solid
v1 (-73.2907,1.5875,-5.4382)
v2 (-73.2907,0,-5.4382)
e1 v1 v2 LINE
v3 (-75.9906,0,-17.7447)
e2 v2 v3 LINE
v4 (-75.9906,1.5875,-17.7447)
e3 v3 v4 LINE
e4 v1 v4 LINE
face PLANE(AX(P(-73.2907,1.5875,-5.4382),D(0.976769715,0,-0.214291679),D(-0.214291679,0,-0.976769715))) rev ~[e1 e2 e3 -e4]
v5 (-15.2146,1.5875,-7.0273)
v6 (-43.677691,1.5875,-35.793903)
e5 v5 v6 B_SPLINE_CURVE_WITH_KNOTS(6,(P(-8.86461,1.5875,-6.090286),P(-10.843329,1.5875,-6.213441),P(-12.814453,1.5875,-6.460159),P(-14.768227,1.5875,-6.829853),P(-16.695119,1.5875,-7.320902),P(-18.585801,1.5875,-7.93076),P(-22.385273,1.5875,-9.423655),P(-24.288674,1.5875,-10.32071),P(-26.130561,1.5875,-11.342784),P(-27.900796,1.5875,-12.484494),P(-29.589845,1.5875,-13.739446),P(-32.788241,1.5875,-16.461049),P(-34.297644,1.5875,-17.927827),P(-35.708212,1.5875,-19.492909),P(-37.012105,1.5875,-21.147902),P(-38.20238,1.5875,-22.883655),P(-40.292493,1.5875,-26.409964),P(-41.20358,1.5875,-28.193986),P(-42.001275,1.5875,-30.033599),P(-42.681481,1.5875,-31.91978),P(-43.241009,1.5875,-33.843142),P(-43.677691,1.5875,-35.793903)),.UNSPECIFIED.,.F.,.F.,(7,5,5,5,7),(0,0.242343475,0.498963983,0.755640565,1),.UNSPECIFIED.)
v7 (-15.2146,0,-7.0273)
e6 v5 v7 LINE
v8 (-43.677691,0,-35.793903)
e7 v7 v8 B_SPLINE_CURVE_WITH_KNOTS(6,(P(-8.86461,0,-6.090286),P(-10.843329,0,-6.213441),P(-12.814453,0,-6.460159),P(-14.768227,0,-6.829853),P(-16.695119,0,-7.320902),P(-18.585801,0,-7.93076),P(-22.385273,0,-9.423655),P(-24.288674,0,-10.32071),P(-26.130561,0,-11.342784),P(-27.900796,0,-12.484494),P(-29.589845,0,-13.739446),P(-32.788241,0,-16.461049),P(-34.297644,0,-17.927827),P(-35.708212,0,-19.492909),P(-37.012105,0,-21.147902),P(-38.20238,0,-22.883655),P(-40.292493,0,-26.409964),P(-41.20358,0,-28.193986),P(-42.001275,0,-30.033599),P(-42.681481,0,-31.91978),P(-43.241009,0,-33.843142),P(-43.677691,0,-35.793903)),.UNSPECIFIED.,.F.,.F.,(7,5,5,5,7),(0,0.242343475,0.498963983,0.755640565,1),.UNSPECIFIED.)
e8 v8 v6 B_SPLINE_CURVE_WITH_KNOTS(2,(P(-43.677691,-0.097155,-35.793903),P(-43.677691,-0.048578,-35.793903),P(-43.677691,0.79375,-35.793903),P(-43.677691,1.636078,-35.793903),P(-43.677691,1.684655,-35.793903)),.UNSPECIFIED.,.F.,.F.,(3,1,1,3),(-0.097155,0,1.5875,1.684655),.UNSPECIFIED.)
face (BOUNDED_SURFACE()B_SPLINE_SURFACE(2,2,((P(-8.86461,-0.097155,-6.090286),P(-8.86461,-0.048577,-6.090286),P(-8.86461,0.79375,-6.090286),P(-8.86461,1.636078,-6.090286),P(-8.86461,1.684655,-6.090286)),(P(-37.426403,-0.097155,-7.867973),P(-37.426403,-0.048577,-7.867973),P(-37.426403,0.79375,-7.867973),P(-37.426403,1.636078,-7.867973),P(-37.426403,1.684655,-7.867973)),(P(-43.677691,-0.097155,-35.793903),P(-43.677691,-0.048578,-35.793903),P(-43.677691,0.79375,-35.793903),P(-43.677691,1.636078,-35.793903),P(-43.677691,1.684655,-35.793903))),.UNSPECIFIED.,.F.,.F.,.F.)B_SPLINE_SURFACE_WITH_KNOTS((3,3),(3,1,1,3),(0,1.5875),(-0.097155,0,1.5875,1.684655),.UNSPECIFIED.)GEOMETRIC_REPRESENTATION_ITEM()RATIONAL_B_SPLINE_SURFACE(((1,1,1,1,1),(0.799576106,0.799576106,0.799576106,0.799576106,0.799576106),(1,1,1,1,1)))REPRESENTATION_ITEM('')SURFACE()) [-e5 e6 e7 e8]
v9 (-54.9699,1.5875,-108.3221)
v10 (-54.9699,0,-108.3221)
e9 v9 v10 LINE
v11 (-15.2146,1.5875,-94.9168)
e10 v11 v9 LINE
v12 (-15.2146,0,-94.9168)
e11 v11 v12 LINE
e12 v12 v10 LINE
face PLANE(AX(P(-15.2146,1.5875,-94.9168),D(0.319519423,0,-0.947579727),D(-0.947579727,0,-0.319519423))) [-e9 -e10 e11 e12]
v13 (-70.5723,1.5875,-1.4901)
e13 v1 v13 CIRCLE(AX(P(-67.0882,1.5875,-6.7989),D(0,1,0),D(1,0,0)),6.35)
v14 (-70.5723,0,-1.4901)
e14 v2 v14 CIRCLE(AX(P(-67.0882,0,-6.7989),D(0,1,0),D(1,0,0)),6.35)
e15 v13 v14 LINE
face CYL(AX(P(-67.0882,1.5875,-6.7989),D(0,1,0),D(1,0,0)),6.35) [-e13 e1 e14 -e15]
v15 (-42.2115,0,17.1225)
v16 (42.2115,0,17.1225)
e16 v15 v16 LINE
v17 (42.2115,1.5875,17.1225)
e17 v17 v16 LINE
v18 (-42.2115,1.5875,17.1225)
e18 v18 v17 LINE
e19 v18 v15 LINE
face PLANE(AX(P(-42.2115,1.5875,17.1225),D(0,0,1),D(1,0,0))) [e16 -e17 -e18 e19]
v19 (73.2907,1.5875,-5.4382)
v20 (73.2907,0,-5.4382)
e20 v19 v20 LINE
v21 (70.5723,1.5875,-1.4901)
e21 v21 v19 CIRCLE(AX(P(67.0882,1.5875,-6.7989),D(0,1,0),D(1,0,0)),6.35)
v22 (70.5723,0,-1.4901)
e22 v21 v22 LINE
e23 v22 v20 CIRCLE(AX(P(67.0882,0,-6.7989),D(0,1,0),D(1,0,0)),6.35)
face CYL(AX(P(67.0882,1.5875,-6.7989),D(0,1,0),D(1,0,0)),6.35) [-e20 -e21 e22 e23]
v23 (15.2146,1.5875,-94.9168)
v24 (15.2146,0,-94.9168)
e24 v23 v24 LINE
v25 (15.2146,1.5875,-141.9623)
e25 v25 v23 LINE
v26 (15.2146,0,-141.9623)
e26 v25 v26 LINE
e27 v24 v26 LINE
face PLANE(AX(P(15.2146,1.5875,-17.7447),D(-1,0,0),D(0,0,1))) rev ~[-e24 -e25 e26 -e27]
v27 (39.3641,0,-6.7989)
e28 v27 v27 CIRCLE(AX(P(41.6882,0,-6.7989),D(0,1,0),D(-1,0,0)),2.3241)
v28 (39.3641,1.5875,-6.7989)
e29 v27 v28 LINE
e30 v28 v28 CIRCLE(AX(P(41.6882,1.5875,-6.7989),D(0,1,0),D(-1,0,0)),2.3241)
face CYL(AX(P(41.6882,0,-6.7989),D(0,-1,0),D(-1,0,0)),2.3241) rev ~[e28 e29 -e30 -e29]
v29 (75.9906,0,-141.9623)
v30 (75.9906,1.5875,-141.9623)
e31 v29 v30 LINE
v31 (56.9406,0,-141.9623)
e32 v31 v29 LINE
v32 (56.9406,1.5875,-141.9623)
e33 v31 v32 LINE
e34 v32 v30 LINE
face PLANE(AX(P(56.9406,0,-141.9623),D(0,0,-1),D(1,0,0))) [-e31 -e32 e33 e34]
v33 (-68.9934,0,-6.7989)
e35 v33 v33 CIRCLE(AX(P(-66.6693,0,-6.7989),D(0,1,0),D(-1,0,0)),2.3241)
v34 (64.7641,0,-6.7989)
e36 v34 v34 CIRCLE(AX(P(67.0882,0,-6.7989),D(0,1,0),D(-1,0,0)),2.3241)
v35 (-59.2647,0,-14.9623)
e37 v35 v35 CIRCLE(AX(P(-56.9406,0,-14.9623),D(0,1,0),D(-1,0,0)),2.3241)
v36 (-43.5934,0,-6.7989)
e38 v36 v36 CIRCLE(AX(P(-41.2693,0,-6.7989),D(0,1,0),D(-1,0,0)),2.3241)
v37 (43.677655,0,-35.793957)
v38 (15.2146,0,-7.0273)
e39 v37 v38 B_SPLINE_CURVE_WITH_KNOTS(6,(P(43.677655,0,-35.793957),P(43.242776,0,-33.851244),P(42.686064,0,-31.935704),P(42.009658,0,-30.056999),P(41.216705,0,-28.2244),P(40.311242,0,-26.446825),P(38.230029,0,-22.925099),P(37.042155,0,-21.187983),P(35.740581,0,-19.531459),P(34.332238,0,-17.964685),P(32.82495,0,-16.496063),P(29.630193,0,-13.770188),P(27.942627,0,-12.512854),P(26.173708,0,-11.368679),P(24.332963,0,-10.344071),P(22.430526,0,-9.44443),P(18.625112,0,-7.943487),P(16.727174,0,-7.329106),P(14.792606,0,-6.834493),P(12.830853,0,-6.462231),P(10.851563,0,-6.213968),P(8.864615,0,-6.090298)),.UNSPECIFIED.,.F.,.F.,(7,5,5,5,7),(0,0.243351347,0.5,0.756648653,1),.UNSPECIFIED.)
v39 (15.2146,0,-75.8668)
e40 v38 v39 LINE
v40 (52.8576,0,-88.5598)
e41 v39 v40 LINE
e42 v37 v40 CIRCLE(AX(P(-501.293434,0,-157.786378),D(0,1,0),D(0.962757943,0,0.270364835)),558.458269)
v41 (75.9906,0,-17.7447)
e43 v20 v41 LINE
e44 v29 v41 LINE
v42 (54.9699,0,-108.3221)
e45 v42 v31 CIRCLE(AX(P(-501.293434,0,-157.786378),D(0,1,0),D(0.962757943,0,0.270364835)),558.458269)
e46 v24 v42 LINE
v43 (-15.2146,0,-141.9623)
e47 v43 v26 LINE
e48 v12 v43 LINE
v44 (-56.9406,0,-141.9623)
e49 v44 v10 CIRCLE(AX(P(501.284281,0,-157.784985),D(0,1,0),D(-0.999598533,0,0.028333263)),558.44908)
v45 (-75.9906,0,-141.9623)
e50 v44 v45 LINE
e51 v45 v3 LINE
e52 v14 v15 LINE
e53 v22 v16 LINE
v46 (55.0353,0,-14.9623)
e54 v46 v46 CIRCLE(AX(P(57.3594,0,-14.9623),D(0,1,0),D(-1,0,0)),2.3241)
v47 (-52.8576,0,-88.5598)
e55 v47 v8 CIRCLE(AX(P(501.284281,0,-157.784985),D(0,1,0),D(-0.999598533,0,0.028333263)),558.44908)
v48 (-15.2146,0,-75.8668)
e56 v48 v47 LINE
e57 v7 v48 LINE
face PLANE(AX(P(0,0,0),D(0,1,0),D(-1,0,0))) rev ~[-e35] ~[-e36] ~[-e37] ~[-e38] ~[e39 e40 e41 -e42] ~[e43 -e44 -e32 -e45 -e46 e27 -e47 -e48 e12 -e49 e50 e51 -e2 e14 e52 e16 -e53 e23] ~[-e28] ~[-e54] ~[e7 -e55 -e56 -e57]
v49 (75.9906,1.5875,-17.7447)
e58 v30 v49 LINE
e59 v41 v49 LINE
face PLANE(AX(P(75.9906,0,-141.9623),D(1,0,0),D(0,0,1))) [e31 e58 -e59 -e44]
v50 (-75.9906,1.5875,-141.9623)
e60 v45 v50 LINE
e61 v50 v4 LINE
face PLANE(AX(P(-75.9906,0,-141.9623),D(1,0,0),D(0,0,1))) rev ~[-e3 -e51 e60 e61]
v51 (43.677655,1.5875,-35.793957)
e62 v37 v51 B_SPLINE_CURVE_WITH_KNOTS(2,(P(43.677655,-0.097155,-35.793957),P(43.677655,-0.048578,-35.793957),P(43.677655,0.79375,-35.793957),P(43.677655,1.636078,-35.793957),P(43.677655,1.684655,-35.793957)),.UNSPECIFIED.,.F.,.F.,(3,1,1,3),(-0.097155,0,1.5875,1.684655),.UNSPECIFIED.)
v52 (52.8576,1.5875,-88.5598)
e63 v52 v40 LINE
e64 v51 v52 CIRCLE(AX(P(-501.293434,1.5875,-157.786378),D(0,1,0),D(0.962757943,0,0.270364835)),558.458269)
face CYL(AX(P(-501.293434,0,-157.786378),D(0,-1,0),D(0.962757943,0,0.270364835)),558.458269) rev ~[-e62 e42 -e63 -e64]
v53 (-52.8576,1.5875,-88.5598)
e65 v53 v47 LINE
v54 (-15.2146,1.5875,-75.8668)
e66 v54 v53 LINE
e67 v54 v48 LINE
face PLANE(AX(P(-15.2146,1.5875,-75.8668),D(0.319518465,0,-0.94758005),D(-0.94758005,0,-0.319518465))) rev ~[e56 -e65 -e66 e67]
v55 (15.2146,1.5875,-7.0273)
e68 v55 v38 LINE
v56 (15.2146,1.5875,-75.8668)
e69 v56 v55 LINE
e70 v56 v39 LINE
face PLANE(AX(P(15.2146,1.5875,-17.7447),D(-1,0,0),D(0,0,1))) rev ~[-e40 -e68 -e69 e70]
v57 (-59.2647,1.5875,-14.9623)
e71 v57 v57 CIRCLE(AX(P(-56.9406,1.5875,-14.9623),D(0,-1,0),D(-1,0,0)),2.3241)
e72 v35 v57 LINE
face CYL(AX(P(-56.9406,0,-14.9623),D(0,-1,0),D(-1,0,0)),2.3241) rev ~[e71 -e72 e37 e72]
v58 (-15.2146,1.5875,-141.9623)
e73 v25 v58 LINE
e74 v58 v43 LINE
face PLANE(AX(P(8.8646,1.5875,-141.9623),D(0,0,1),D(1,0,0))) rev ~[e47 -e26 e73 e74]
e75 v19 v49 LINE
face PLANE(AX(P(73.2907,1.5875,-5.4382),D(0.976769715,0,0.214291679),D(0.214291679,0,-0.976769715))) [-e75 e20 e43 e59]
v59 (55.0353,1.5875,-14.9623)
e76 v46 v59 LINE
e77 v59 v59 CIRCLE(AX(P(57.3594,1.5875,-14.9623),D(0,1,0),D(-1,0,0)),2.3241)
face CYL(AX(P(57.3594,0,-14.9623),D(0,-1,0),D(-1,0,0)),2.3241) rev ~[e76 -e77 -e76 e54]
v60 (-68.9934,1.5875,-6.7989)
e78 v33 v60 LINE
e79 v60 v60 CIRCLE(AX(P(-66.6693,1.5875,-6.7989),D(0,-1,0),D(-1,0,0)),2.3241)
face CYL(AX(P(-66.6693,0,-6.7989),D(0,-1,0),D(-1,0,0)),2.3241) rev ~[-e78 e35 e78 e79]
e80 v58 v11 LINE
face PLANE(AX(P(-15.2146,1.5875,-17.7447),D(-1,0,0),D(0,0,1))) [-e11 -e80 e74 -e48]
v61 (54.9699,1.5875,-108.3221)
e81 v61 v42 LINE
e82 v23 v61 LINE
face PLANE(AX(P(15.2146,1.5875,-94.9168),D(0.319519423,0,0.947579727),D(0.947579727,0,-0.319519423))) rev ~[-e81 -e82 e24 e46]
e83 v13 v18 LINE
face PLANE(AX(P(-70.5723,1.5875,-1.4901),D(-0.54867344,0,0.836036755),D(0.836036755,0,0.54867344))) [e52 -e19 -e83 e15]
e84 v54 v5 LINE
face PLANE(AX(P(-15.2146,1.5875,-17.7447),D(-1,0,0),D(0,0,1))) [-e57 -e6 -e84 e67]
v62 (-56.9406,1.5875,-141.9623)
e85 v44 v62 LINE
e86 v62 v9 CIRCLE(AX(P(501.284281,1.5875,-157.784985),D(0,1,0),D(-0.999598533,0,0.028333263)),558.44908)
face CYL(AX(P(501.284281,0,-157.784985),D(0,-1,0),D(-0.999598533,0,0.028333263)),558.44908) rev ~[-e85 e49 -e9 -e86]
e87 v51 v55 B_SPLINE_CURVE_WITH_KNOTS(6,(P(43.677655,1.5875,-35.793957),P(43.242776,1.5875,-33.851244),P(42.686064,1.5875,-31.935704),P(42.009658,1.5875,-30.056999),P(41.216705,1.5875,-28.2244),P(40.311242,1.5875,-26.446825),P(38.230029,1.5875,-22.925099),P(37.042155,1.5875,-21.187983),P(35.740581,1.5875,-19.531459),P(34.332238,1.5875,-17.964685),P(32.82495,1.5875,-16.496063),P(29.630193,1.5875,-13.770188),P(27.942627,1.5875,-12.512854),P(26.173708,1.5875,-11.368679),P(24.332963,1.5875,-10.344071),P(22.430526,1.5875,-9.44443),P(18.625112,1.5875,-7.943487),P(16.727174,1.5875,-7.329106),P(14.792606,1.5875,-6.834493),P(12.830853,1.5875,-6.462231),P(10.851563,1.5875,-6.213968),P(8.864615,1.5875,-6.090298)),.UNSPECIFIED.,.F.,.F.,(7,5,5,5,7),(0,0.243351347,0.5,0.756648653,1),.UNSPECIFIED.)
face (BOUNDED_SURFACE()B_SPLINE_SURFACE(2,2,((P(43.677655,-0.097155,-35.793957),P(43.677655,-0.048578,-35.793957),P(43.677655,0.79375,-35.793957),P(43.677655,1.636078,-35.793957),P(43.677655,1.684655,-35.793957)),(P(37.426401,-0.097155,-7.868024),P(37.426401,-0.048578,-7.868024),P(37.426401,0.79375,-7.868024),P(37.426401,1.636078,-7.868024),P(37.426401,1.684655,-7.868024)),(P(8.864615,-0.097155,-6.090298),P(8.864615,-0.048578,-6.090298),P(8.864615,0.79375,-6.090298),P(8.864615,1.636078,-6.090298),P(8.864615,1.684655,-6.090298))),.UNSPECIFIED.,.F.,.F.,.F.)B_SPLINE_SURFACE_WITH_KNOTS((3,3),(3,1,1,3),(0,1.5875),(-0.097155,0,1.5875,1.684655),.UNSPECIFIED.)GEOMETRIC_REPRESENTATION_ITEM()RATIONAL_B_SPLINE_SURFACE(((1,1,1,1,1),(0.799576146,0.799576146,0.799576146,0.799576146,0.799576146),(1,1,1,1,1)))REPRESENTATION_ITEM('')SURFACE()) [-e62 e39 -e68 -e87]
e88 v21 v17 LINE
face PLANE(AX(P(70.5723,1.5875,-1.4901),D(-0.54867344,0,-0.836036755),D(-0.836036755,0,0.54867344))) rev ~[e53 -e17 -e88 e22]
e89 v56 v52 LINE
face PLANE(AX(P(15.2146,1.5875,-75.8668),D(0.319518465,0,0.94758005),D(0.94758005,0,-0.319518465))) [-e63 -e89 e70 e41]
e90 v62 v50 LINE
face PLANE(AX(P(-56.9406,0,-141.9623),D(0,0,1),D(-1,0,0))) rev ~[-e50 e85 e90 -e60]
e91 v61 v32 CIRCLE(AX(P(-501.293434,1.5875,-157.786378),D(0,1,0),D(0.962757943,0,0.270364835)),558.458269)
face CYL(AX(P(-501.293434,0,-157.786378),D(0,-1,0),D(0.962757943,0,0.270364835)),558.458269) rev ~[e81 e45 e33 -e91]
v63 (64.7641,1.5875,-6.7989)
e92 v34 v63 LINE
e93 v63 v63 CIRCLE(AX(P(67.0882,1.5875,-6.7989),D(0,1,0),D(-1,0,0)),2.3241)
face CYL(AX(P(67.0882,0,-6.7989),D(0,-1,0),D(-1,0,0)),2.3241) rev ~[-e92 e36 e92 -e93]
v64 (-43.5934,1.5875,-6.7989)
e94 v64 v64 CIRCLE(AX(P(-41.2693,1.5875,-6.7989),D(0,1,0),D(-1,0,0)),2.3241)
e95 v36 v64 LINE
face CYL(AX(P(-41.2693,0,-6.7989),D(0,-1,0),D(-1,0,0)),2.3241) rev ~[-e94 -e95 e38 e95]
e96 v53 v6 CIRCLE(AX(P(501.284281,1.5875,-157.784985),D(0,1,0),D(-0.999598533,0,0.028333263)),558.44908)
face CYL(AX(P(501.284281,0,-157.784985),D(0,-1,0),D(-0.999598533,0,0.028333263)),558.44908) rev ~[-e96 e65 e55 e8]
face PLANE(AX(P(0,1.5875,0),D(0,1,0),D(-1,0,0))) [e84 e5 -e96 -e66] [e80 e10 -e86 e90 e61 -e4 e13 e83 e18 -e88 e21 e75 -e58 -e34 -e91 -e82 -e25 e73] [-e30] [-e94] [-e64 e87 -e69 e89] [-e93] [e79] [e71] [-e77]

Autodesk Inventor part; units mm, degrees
ref_plane "YZ Plane" through (0, 0, 0) normal (1, 0, 0) x (0, 1, 0)
ref_plane "XZ Plane" through (0, 0, 0) normal (0, 1, 0) x (-1, 0, 0)
ref_plane "XY Plane" through (0, 0, 0) normal (0, 0, 1) x (1, 0, 0)
sketch "Sketch1" plane through (0, 0, 0) normal (0, 1, 0) x (-1, 0, 0)
  circle A0 centre (56.9406, -14.9623) radius 2.3241
  circle A1 centre (66.6693, -6.7989) radius 2.3241
  circle A2 centre (41.2693, -6.7989) radius 2.3241
  circle A3 centre (-41.6882, -6.7989) radius 2.3241
  circle A4 centre (-57.3594, -14.9623) radius 2.3241
  circle A5 centre (-67.0882, -6.7989) radius 2.3241
  arc A6 (-59.7156, -7.3708) -> (-58.0844, -7.6169) centre (-58.6976, -6.1526) ccw
  line L0 (-59.7156, -7.3708) -> (-85.288, 13.999)
  arc A7 (-43.7185, -2.4382) -> (-58.0844, -7.6169) centre (0.2546, -146.9346) ccw
  arc A8 (-43.7185, -2.4382) -> (-37.2086, 0.6056) centre (-51.1134, 21.8615) ccw
  arc A9 (-69.7478, -12.8722) -> (-69.4607, -10.2448) centre (-70.4786, -11.4629) ccw
  line L1 (-99.204, 14.6104) -> (-69.4607, -10.2448)
  arc A10 (-69.7478, -12.8722) -> (-78.2828, -17.6558) centre (-0.2094, -146.9516) ccw
  arc A11 (-16.3345, 6.2393) -> (-15.3068, 3.3313) centre (-15.4655, 4.9108) ccw
  arc A12 (14.8879, 3.3313) -> (-15.3068, 3.3313) centre (-0.2094, -146.9516) ccw
  arc A13 (14.8879, 3.3313) -> (15.9157, 6.2393) centre (15.0466, 4.9108) ccw
  arc A14 (37.2538, 0.5886) -> (43.7637, -2.4551) centre (51.1586, 21.8446) ccw
  arc A15 (58.1296, -7.6339) -> (43.7637, -2.4551) centre (-0.2094, -146.9516) ccw
  line L2 (85.3331, 13.982) -> (59.7607, -7.3877)
  arc A16 (58.1296, -7.6339) -> (59.7607, -7.3877) centre (58.7428, -6.1696) ccw
  line L3 (69.0418, -10.2448) -> (98.7851, 14.6104)
  arc A17 (69.0418, -10.2448) -> (69.3289, -12.8722) centre (70.0598, -11.4629) ccw
  arc A18 (77.8639, -17.6558) -> (69.3289, -12.8722) centre (-0.2094, -146.9516) ccw
  line L4 (66.6693, -6.7989) -> (41.2693, -6.7989)
  line L5 (0, 0) -> (0, 4.0875)
  circle A19 centre (66.6693, -6.7989) radius 3.9782
  circle A20 centre (41.2693, -6.7989) radius 4.9026
  line L6 (66.6693, -2.8207) -> (41.4483, -1.8996)
  circle A21 centre (56.9406, -14.9623) radius 4.1852
  line L7 (69.4813, -9.613) -> (60.0669, -17.7447)
  line L8 (54.6165, -18.4429) -> (39.1949, -11.241)
  line L9 (56.9406, -14.9623) -> (56.9406, -141.9623)
  arc A22 (56.9406, -141.9623) -> (36.3667, -6.7989) centre (-501.2889, -157.7854) ccw
  line L10 (56.9406, -141.9623) -> (75.9906, -141.9623)
  line L11 (75.9906, -141.9623) -> (75.9906, -17.7447)
  line L12 (75.9906, -17.7447) -> (65.708, -12.8722)
  circle A23 centre (-66.6693, -6.7989) radius 3.9782
  circle A24 centre (-41.2693, -6.7989) radius 4.9026
  line L13 (-66.6693, -2.8207) -> (-41.4483, -1.8996)
  circle A25 centre (-56.9406, -14.9623) radius 4.1852
  line L14 (-69.4813, -9.613) -> (-60.0669, -17.7447)
  arc A26 (-36.3667, -6.7989) -> (-56.9406, -141.9623) centre (501.2889, -157.7854) ccw
  line L15 (-56.9406, -141.9623) -> (-75.9906, -141.9623)
  line L16 (-75.9906, -141.9623) -> (-75.9906, -17.7447)
  line L17 (-75.9906, -17.7447) -> (-65.708, -12.8722)
  arc A27 (42.2115, -1.9275) -> (-42.2115, -1.9275) centre (0, -148.5156) ccw
  arc A28 (39.6774, -11.4417) -> (-39.7321, -11.4576) centre (0, -148.5156) ccw
  point P0 (-37.4811, -10.825)
  point P1 (37.4811, -10.825)
  dimension "d0" = 127
  dimension "d1" = 19.05
extrude "Extrusion1" add sketch "Sketch1" along normal blind 1.5875 contours L0 L13 A8 A7 A6 | A6 A7 A8 A24 A26 L15 L16 L17 L14 A23 L13 L0 | A23 L14 | L13 A24 A8 | A27 L6 A20 A22 A28 A26 A24 L13 | A24 A26 | A26 A24 | L6 L2 L4 A15 A14 | A14 A20 L6 | A14 A15 L4 A20 | A20 A22 | L6 A19 L2 | A28 L8 A21 L9 A22 | A22 A20 L8 A28 | L4 A15 A16 L2 A19 L7 A21 L8 A20 | A22 A20 | A19 L4 L2 | A19 L7 | L9 A21 L7 L12 L11 L10 | L4 L2 A16 A15 | A21 | A25 picked at (-63.4219, -7.1214) picked at (63.3048, -7.3068)
fillet "Fillet1" radius 38.1 2 edges at (37.4811, 0.7937, -10.825) (-37.4811, 0.7937, -10.825)
sketch "Sketch2" plane through (0, 1.5875, 0) normal (0, 1, 0) x (1, 0, 0)
  line L0 (0, 0) -> (0, -4.0291)
  arc A0 (-42.2115, 1.9275) -> (42.2115, 1.9275) centre (0, 148.5156) ccw projected
  line L1 (42.2115, 1.9275) -> (66.6693, 2.8207) projected
  arc A1 (66.6693, 2.8207) -> (69.4813, 9.613) centre (66.6693, 6.7989) ccw projected
  line L2 (69.4813, 9.613) -> (65.708, 12.8722) projected
  line L3 (65.708, 12.8722) -> (75.9906, 17.7447) projected
  line L4 (75.9906, 17.7447) -> (75.9906, 141.9623) projected
  line L5 (75.9906, 141.9623) -> (56.9406, 141.9623) projected
  arc A2 (43.6777, 35.794) -> (56.9406, 141.9623) centre (-501.2889, 157.7854) ccw projected
  arc A3 (8.8646, 6.0903) -> (43.6777, 35.794) centre (6.4979, 44.1168) ccw projected
  arc A4 (-8.8646, 6.0903) -> (8.8646, 6.0903) centre (0, 148.5156) ccw projected
  arc A5 (-43.6777, 35.794) -> (-8.8646, 6.0903) centre (-6.4979, 44.1168) ccw projected
  arc A6 (-56.9406, 141.9623) -> (-43.6777, 35.794) centre (501.2889, 157.7854) ccw projected
  line L6 (-56.9406, 141.9623) -> (-75.9906, 141.9623) projected
  line L7 (-75.9906, 141.9623) -> (-75.9906, 17.7447) projected
  line L8 (-75.9906, 17.7447) -> (-65.708, 12.8722) projected
  line L9 (-65.708, 12.8722) -> (-69.4813, 9.613) projected
  arc A7 (-69.4813, 9.613) -> (-66.6693, 2.8207) centre (-66.6693, 6.7989) ccw projected
  line L10 (-66.6693, 2.8207) -> (-42.2115, 1.9275) projected
  arc A8 (-42.2115, 1.9275) -> (42.2115, 1.9275) centre (0, 148.5156) ccw projected
  circle A9 centre (-41.2693, 6.7989) radius 2.3241 projected
  circle A10 centre (-66.6693, 6.7989) radius 2.3241 projected
  circle A11 centre (57.3594, 14.9623) radius 2.3241 projected
  circle A12 centre (67.0882, 6.7989) radius 2.3241 projected
  circle A13 centre (41.6882, 6.7989) radius 2.3241 projected
  circle A14 centre (-56.9406, 14.9623) radius 2.3241 projected
  circle A15 centre (67.0882, 6.7989) radius 6.35
  line L11 (73.2907, 5.4382) -> (75.9906, 17.7447)
  line L12 (42.2115, 1.9275) -> (66.7086, 0.4603)
  circle A16 centre (-67.0882, 6.7989) radius 6.35
  line L13 (-73.2907, 5.4382) -> (-75.9906, 17.7447)
  line L14 (-42.2115, 1.9275) -> (-66.7086, 0.4603)
  point P0 (-42.2115, 1.9275)
  dimension "d5" = 12.7
extrude "Extrusion2" add sketch "Sketch2" against normal blind 1.5875 contours L14 A16 L10 | A16 L8 L9 A7 L10 | L1 A15 L12 | L13 L8 A16 | L1 A1 L2 L3 A15 | L3 L11 A15 picked at (-67.6214, 11.869) picked at (67.6293, 11.8682)
sketch "Sketch3" plane through (0, 1.5875, 0) normal (0, 1, 0) x (1, 0, 0)
  line L0 (75.9906, 17.7447) -> (75.9906, 141.9623) projected
  line L1 (75.9906, 141.9623) -> (56.9406, 141.9623) projected
  arc A0 (43.6777, 35.794) -> (56.9406, 141.9623) centre (-501.2889, 157.7854) ccw projected
  arc A1 (8.8646, 6.0903) -> (43.6777, 35.794) centre (6.4979, 44.1168) ccw projected
  arc A2 (-8.8646, 6.0903) -> (8.8646, 6.0903) centre (0, 148.5156) ccw projected
  arc A3 (-43.6777, 35.794) -> (-8.8646, 6.0903) centre (-6.4979, 44.1168) ccw projected
  arc A4 (-56.9406, 141.9623) -> (-43.6777, 35.794) centre (501.2889, 157.7854) ccw projected
  line L2 (-56.9406, 141.9623) -> (-75.9906, 141.9623) projected
  line L3 (-75.9906, 141.9623) -> (-75.9906, 17.7447) projected
  line L4 (-75.9906, 17.7447) -> (-73.2907, 5.4382) projected
  arc A5 (-73.2907, 5.4382) -> (-66.7086, 0.4603) centre (-67.0882, 6.7989) ccw projected
  line L5 (-66.7086, 0.4603) -> (-42.2115, 1.9275) projected
  arc A6 (-42.2115, 1.9275) -> (42.2115, 1.9275) centre (0, 148.5156) ccw projected
  line L6 (42.2115, 1.9275) -> (66.7086, 0.4603) projected
  arc A7 (66.7086, 0.4603) -> (73.2907, 5.4382) centre (67.0882, 6.7989) ccw projected
  line L7 (73.2907, 5.4382) -> (75.9906, 17.7447) projected
  circle A8 centre (-41.2693, 6.7989) radius 2.3241 projected
  circle A9 centre (-66.6693, 6.7989) radius 2.3241 projected
  circle A10 centre (57.3594, 14.9623) radius 2.3241 projected
  circle A11 centre (67.0882, 6.7989) radius 2.3241 projected
  circle A12 centre (41.6882, 6.7989) radius 2.3241 projected
  circle A13 centre (-56.9406, 14.9623) radius 2.3241 projected
  line L8 (-75.9906, 141.9623) -> (-75.9906, 17.7447) projected
  line L9 (75.9906, 17.7447) -> (-75.9906, 17.7447)
  line L10 (-75.9906, 17.7447) -> (0, 17.7447)
  line L11 (0, 17.7447) -> (0, 5.8147)
  arc A14 (-8.8646, 6.0903) -> (8.8646, 6.0903) centre (0, 148.5156) ccw projected
  line L12 (8.8646, 141.9623) -> (-8.8646, 141.9623)
  line L13 (8.8646, 141.9623) -> (15.2146, 141.9623)
  line L14 (-8.8646, 141.9623) -> (-15.2146, 141.9623)
  line L15 (-15.2146, 141.9623) -> (-15.2146, 7.0273)
  line L16 (15.2146, 141.9623) -> (15.2146, 7.0273)
  point P0 (0, 0)
  dimension "d8" = 6.35
  dimension "d9" = 6.35
extrude "Extrusion3" add sketch "Sketch3" against normal blind 1.5875 contours A1 A2 L11 L9 L16 | L9 L15 L14 L12 L13 L16 | L11 A2 A3 L15 L9
sketch "Sketch4" plane through (0, 1.5875, 0) normal (0, 1, 0) x (1, 0, 0)
  line L0 (75.9906, 17.7447) -> (75.9906, 141.9623) projected
  line L1 (75.9906, 141.9623) -> (56.9406, 141.9623) projected
  arc A0 (43.6777, 35.794) -> (56.9406, 141.9623) centre (-501.2889, 157.7854) ccw projected
  arc A1 (15.2146, 7.0273) -> (43.6777, 35.794) centre (6.4979, 44.1168) ccw projected
  line L2 (15.2146, 7.0273) -> (15.2146, 141.9623) projected
  line L3 (15.2146, 141.9623) -> (-15.2146, 141.9623) projected
  line L4 (-15.2146, 141.9623) -> (-15.2146, 7.0273) projected
  arc A2 (-43.6777, 35.794) -> (-15.2146, 7.0273) centre (-6.4979, 44.1168) ccw projected
  arc A3 (-56.9406, 141.9623) -> (-43.6777, 35.794) centre (501.2889, 157.7854) ccw projected
  line L5 (-56.9406, 141.9623) -> (-75.9906, 141.9623) projected
  line L6 (-75.9906, 141.9623) -> (-75.9906, 17.7447) projected
  line L7 (-75.9906, 17.7447) -> (-73.2907, 5.4382) projected
  arc A4 (-73.2907, 5.4382) -> (-66.7086, 0.4603) centre (-67.0882, 6.7989) ccw projected
  line L8 (-66.7086, 0.4603) -> (-42.2115, 1.9275) projected
  arc A5 (-42.2115, 1.9275) -> (42.2115, 1.9275) centre (0, 148.5156) ccw projected
  line L9 (42.2115, 1.9275) -> (66.7086, 0.4603) projected
  arc A6 (66.7086, 0.4603) -> (73.2907, 5.4382) centre (67.0882, 6.7989) ccw projected
  line L10 (73.2907, 5.4382) -> (75.9906, 17.7447) projected
  circle A7 centre (-41.2693, 6.7989) radius 2.3241 projected
  circle A8 centre (-66.6693, 6.7989) radius 2.3241 projected
  circle A9 centre (57.3594, 14.9623) radius 2.3241 projected
  circle A10 centre (67.0882, 6.7989) radius 2.3241 projected
  circle A11 centre (41.6882, 6.7989) radius 2.3241 projected
  circle A12 centre (-56.9406, 14.9623) radius 2.3241 projected
  line L11 (-15.2146, 44.1168) -> (15.2146, 44.1168)
  line L12 (15.2146, 44.1168) -> (15.2146, 75.8668)
  line L13 (15.2146, 75.8668) -> (52.8576, 88.5598)
  arc A13 (43.6777, 35.794) -> (56.9406, 141.9623) centre (-501.2889, 157.7854) ccw projected
  line L14 (15.2146, 75.8668) -> (15.2146, 94.9168)
  line L15 (15.2146, 141.9623) -> (15.2146, 7.0273) projected
  line L16 (15.2146, 94.9168) -> (54.9699, 108.3221)
  line L17 (0, 44.1168) -> (0, 50.0619)
  line L18 (-15.2146, 75.8668) -> (-52.8576, 88.5598)
  line L19 (-15.2146, 94.9168) -> (-54.9699, 108.3221)
  point P0 (0, 0)
  dimension "d12" = 31.75
  dimension "d13" = 19.05
extrude "Extrusion4" add sketch "Sketch4" against normal blind 1.5875 contours A0 L13 L2 L16 | L4 L18 A3 L19
sketch "Sketch5" plane through (0, 1.5875, 0) normal (0, 1, 0) x (1, 0, 0)
  arc A0 (43.6777, 35.794) -> (52.8576, 88.5598) centre (-501.2889, 157.7854) ccw projected
  arc A1 (15.2146, 7.0273) -> (43.6777, 35.794) centre (6.4979, 44.1168) ccw projected
  line L0 (15.2146, 7.0273) -> (15.2146, 75.8668) projected
  line L1 (15.2146, 75.8668) -> (52.8576, 88.5598) projected
  line L2 (54.9699, 108.3221) -> (15.2146, 94.9168) projected
  line L3 (15.2146, 94.9168) -> (15.2146, 141.9623) projected
  line L4 (15.2146, 141.9623) -> (-15.2146, 141.9623) projected
  line L5 (-15.2146, 141.9623) -> (-15.2146, 94.9168) projected
  line L6 (-15.2146, 94.9168) -> (-54.9699, 108.3221) projected
  arc A2 (-56.9406, 141.9623) -> (-54.9699, 108.3221) centre (501.2889, 157.7854) ccw projected
  line L7 (-56.9406, 141.9623) -> (-75.9906, 141.9623) projected
  line L8 (-75.9906, 141.9623) -> (-75.9906, 17.7447) projected
  line L9 (-75.9906, 17.7447) -> (-73.2907, 5.4382) projected
  arc A3 (-73.2907, 5.4382) -> (-66.7086, 0.4603) centre (-67.0882, 6.7989) ccw projected
  line L10 (-66.7086, 0.4603) -> (-42.2115, 1.9275) projected
  arc A4 (-42.2115, 1.9275) -> (42.2115, 1.9275) centre (0, 148.5156) ccw projected
  line L11 (42.2115, 1.9275) -> (66.7086, 0.4603) projected
  arc A5 (66.7086, 0.4603) -> (73.2907, 5.4382) centre (67.0882, 6.7989) ccw projected
  line L12 (73.2907, 5.4382) -> (75.9906, 17.7447) projected
  line L13 (75.9906, 17.7447) -> (75.9906, 141.9623) projected
  line L14 (75.9906, 141.9623) -> (56.9406, 141.9623) projected
  arc A6 (54.9699, 108.3221) -> (56.9406, 141.9623) centre (-501.2889, 157.7854) ccw projected
  line L15 (-52.8576, 88.5598) -> (-15.2146, 75.8668) projected
  line L16 (-15.2146, 75.8668) -> (-15.2146, 7.0273) projected
  arc A7 (-43.6777, 35.794) -> (-15.2146, 7.0273) centre (-6.4979, 44.1168) ccw projected
  arc A8 (-52.8576, 88.5598) -> (-43.6777, 35.794) centre (501.2889, 157.7854) ccw projected
  circle A9 centre (-41.2693, 6.7989) radius 2.3241 projected
  circle A10 centre (-66.6693, 6.7989) radius 2.3241 projected
  circle A11 centre (57.3594, 14.9623) radius 2.3241 projected
  circle A12 centre (67.0882, 6.7989) radius 2.3241 projected
  circle A13 centre (41.6882, 6.7989) radius 2.3241 projected
  circle A14 centre (-56.9406, 14.9623) radius 2.3241 projected
  line L17 (-42.2115, 1.9275) -> (-42.2115, -17.1225)
  line L18 (-70.5723, 1.4901) -> (-42.2115, -17.1225)
  line L19 (0, 0) -> (0, -4.0291)
  arc A15 (-73.2907, 5.4382) -> (-66.7086, 0.4603) centre (-67.0882, 6.7989) ccw projected
  line L20 (42.2115, 1.9275) -> (42.2115, -17.1225)
  line L21 (70.5723, 1.4901) -> (42.2115, -17.1225)
  line L22 (-42.2115, -17.1225) -> (42.2115, -17.1225)
  dimension "d16" = 19.05
extrude "Extrusion5" add sketch "Sketch5" against normal blind 1.5875 contours L21 L20 L11 A5 | L22 L17 A4 L20 | L18 A3 L10 L17
properties part number "ABS Intake Hood"
